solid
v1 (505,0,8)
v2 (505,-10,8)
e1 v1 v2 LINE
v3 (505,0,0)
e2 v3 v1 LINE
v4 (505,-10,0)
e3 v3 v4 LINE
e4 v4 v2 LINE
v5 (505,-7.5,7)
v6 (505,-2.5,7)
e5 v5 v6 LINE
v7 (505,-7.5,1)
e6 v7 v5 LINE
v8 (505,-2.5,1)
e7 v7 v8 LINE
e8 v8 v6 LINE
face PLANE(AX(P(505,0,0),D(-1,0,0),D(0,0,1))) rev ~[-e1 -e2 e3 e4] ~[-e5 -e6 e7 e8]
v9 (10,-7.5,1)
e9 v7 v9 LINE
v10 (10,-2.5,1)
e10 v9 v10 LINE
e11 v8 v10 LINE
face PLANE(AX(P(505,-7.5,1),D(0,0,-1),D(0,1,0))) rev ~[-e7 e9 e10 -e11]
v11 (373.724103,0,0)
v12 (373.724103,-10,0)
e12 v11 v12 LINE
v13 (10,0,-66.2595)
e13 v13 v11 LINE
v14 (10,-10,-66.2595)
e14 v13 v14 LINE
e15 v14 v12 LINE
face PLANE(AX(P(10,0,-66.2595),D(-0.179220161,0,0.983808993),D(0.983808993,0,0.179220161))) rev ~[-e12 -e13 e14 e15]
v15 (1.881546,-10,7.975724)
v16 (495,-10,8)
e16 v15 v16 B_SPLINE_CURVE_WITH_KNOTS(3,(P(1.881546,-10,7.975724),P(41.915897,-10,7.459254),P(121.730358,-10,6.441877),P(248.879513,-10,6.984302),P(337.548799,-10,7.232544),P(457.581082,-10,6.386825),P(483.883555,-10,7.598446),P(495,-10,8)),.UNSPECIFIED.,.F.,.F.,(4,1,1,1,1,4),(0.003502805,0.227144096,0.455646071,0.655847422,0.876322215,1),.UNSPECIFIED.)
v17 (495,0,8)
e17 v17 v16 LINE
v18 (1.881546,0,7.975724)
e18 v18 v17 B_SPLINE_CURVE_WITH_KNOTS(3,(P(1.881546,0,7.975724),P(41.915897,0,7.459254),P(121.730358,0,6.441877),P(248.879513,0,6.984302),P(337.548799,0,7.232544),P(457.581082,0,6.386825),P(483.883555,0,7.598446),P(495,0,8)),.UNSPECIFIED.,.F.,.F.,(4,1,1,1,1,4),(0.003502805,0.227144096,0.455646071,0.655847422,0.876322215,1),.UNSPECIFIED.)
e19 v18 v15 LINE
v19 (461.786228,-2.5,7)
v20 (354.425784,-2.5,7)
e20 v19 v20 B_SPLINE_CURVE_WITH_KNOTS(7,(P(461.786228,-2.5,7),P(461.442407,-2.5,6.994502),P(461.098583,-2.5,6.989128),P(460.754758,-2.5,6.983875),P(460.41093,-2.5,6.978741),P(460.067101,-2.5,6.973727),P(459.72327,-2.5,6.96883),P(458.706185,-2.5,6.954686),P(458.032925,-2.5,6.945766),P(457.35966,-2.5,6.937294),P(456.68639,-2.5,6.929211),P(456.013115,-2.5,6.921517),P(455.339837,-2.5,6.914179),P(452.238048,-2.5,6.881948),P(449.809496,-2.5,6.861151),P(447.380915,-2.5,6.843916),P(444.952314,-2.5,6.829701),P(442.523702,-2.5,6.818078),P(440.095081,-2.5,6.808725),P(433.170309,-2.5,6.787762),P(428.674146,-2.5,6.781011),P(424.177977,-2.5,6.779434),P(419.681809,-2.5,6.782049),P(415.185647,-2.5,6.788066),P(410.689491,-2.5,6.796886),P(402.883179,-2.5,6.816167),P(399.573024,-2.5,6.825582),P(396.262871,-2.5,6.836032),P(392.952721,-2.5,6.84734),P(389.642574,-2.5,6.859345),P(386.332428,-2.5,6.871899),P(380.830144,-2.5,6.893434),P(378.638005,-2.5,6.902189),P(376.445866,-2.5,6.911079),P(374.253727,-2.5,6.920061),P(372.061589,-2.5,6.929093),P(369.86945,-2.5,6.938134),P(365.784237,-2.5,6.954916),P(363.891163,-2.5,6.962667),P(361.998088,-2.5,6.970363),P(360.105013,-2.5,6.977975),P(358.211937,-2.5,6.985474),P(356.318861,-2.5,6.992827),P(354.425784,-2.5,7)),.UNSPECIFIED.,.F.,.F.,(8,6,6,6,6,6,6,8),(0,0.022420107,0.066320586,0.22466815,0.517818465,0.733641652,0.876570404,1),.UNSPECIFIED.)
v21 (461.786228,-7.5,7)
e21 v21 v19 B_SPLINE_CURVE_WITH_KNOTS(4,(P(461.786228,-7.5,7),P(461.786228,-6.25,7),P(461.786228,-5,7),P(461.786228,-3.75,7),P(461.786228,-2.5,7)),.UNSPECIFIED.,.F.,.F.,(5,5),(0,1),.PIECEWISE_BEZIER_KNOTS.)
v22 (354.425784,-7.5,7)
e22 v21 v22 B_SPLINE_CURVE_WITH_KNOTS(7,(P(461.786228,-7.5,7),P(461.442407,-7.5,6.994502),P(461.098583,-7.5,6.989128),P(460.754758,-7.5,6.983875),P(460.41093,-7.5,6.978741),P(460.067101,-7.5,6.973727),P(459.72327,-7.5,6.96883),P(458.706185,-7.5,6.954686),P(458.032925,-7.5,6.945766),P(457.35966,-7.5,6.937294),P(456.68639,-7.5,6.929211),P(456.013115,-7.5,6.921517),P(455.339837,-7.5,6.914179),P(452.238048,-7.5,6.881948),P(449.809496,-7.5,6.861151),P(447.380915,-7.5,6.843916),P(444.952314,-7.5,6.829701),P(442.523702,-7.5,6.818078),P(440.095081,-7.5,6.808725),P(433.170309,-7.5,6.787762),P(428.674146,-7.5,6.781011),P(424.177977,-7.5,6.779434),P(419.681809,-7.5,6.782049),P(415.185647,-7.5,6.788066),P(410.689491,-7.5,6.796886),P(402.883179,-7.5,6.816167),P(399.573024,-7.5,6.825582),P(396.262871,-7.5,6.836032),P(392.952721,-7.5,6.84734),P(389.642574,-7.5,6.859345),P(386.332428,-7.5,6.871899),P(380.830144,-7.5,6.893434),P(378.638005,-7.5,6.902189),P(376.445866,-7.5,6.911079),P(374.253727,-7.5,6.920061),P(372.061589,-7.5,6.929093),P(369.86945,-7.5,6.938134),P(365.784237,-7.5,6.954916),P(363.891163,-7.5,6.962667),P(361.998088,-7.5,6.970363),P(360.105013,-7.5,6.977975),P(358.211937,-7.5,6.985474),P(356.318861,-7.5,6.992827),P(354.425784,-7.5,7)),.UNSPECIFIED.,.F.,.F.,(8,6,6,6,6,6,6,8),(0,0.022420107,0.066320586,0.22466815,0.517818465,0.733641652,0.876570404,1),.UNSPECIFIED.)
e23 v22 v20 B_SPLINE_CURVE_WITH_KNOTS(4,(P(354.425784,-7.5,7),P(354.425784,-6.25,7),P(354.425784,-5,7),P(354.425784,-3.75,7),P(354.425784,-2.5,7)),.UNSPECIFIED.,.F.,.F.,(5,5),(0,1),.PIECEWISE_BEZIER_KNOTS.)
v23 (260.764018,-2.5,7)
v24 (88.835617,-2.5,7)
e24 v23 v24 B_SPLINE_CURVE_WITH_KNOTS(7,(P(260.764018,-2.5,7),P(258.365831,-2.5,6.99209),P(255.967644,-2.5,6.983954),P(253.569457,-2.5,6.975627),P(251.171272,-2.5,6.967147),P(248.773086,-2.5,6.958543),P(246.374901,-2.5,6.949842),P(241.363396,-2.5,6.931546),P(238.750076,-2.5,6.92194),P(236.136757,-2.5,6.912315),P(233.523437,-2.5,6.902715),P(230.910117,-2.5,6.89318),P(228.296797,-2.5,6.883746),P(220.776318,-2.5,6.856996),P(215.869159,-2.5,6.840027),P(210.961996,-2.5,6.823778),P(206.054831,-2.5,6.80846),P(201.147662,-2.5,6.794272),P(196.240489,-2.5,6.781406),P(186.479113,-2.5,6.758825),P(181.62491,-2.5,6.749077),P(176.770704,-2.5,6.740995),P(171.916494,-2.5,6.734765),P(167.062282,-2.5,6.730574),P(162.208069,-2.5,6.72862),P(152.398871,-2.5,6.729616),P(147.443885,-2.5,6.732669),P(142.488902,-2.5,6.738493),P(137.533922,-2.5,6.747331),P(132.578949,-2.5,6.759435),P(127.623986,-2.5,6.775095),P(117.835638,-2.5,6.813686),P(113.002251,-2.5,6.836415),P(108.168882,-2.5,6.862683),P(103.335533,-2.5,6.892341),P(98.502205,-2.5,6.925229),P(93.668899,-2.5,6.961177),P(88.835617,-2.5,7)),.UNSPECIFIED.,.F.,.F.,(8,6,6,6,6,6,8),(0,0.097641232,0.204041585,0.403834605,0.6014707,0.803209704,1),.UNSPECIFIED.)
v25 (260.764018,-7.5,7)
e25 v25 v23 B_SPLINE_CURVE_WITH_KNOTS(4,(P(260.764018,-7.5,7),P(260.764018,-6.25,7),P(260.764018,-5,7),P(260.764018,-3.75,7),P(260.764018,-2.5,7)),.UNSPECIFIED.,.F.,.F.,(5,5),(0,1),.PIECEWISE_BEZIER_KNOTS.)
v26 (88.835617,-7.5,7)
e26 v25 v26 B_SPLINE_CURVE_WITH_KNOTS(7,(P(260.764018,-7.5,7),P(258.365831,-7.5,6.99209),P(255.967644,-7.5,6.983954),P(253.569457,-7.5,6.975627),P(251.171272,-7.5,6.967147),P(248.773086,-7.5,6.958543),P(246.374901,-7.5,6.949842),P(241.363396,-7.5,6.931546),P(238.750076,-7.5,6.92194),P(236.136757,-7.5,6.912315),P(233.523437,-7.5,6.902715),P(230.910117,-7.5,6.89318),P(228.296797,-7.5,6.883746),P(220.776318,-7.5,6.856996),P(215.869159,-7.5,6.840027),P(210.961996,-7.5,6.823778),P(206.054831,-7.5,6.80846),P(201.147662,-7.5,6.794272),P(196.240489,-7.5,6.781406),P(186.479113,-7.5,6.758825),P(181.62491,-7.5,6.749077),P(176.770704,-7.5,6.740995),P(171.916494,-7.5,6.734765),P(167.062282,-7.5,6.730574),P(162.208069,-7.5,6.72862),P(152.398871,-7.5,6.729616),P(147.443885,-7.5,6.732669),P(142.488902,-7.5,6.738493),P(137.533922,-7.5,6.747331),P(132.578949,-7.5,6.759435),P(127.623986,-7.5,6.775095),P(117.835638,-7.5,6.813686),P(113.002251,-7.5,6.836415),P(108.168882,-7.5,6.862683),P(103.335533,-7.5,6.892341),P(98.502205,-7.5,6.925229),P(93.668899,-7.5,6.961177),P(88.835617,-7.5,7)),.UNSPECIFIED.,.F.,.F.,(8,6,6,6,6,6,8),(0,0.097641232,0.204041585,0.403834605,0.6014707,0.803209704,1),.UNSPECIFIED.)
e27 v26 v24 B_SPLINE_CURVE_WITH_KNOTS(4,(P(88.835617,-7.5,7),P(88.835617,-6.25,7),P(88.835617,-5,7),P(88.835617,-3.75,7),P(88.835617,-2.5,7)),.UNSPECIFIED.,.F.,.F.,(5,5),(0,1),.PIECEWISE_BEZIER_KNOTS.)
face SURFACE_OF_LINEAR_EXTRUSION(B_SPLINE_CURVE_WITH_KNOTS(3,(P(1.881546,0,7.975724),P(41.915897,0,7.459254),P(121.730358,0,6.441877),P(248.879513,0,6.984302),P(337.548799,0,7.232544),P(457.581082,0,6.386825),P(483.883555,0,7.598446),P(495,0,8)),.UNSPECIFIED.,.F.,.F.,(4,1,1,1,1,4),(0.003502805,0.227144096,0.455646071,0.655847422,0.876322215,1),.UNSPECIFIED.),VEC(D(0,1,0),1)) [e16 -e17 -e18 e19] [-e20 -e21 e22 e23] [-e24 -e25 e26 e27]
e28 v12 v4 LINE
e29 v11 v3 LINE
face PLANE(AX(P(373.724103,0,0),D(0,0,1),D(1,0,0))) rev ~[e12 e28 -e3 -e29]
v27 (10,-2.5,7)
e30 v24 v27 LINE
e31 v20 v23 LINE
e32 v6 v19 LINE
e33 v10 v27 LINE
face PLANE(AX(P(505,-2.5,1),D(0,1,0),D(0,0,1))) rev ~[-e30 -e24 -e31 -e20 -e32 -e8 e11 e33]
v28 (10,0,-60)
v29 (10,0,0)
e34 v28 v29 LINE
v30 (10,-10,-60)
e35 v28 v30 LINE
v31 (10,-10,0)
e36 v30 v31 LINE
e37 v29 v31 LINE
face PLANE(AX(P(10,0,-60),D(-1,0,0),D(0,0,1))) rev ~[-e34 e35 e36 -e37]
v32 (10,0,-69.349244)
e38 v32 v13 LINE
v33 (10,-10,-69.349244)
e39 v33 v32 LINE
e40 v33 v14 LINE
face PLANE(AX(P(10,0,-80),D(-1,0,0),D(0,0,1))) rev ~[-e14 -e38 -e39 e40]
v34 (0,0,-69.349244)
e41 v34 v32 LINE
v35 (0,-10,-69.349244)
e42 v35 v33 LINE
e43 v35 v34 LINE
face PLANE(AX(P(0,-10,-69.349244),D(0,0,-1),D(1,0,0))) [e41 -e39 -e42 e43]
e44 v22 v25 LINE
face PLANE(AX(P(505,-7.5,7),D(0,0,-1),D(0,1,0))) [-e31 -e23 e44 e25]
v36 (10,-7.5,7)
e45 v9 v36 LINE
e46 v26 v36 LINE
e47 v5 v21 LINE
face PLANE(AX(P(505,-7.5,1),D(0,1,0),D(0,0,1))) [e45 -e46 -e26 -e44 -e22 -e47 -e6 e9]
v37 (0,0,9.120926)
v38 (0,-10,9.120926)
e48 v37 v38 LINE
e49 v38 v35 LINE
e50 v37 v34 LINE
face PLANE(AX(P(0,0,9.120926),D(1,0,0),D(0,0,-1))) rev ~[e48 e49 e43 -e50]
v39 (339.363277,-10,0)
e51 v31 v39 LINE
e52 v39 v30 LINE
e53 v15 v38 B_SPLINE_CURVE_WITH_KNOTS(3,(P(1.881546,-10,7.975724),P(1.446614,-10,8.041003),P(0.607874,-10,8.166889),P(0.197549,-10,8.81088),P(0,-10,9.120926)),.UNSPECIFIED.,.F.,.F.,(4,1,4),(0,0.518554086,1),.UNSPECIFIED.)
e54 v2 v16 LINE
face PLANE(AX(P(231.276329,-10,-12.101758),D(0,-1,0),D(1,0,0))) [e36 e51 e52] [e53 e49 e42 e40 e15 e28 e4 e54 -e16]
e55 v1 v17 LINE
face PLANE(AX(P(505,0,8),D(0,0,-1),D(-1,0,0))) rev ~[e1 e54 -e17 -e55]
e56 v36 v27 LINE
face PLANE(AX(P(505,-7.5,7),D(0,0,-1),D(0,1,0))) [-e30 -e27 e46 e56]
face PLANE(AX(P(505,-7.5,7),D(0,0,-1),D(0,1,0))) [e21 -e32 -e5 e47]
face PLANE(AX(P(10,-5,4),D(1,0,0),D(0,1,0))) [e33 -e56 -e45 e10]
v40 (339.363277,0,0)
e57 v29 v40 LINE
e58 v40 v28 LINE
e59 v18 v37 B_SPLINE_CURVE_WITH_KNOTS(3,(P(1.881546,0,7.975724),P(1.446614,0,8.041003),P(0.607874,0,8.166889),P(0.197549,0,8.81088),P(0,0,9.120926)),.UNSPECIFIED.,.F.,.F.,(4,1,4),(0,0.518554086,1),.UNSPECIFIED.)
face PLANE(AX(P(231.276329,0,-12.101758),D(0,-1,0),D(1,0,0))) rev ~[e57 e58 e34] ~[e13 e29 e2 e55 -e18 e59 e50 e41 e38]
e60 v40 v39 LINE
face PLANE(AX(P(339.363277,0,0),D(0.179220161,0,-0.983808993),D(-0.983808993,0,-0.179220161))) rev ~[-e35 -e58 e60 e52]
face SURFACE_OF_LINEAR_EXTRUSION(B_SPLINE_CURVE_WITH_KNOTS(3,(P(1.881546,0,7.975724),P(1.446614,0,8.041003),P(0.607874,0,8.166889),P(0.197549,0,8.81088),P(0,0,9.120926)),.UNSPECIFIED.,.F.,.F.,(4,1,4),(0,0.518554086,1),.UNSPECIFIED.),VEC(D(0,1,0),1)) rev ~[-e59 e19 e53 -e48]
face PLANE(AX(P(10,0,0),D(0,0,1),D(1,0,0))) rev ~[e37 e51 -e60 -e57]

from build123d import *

# Parameters (mm, degrees)
F1_DEPTH = 10
F2_W     = 5
F2_H     = 6
F3_DEPTH = 495
F4_W     = 10
F4_H     = 10.6507557631
F5_DEPTH = 25


with BuildPart() as f1:
    # F0 (on Front) → F1 (new body)
    with BuildSketch(Plane.XZ):
        with BuildLine():
            Line((0, 8), (0, 0))
            Line((0, 0), (0, -80))
            Line((0, -80), (10, -80))
            Line((10, -80), (10, -66.2595003911))
            Line((10, -66.2595003911), (373.7241029739, 0))
            Line((373.7241029739, 0), (505, 0))
            Line((505, 0), (505, 8))
            Line((505, 8), (495, 8))
            add(Edge.make_bspline(
                [(1.8815460355, 7.9757237206), (41.9158968697, 7.4592539668), (121.7303576786, 6.4418774159), (248.8795131648, 6.9843016), (337.5487991179, 7.2325436144), (457.5810815868, 6.3868246941), (483.8835547527, 7.5984463681), (495, 8)],
                knots=[0.0035028054, 0.0035028054, 0.0035028054, 0.0035028054, 0.2271440961, 0.4556460712, 0.6558474221, 0.8763222147, 1, 1, 1, 1], degree=3))
            add(Edge.make_bspline(
                [(0, 8), (0.627325076, 7.9919054957), (1.2545037706, 7.9838129829), (1.8815460355, 7.9757237206)],
                knots=[0, 0, 0, 0, 0.0035028054, 0.0035028054, 0.0035028054, 0.0035028054], degree=3))
        make_face()
        Polygon((10, -60), (10, 0), (339.3632769585, 0), align=None, mode=Mode.SUBTRACT)
        with BuildLine():
            Line((0, 9.1209262609), (0, 8))
            add(Edge.make_bspline(
                [(0, 8), (0.627325076, 7.9919054957), (1.2545037706, 7.9838129829), (1.8815460355, 7.9757237206)],
                knots=[0, 0, 0, 0, 0.0035028054, 0.0035028054, 0.0035028054, 0.0035028054], degree=3))
            add(Edge.make_bspline(
                [(1.8815460355, 7.9757237206), (1.4466139308, 8.041002586), (0.6078738326, 8.1668889057), (0.1975491446, 8.8108795813), (0, 9.1209262609)],
                knots=[0, 0, 0, 0, 0.5185540858, 1, 1, 1, 1], degree=3))
        make_face()
    extrude(amount=F1_DEPTH)

    # F2 (on face) → F3 (cut)
    with BuildSketch(Plane.YZ.offset(505)):
        with Locations((-5, 4)):
            Rectangle(F2_W, F2_H)
    extrude(amount=-F3_DEPTH, mode=Mode.SUBTRACT)

    # F4 (on face) → F5 (cut)
    with BuildSketch(Plane.XZ.offset(10)):
        with Locations((5, -74.6746221185)):
            Rectangle(F4_W, F4_H)
    extrude(amount=-F5_DEPTH, mode=Mode.SUBTRACT)


solid = f1.part
